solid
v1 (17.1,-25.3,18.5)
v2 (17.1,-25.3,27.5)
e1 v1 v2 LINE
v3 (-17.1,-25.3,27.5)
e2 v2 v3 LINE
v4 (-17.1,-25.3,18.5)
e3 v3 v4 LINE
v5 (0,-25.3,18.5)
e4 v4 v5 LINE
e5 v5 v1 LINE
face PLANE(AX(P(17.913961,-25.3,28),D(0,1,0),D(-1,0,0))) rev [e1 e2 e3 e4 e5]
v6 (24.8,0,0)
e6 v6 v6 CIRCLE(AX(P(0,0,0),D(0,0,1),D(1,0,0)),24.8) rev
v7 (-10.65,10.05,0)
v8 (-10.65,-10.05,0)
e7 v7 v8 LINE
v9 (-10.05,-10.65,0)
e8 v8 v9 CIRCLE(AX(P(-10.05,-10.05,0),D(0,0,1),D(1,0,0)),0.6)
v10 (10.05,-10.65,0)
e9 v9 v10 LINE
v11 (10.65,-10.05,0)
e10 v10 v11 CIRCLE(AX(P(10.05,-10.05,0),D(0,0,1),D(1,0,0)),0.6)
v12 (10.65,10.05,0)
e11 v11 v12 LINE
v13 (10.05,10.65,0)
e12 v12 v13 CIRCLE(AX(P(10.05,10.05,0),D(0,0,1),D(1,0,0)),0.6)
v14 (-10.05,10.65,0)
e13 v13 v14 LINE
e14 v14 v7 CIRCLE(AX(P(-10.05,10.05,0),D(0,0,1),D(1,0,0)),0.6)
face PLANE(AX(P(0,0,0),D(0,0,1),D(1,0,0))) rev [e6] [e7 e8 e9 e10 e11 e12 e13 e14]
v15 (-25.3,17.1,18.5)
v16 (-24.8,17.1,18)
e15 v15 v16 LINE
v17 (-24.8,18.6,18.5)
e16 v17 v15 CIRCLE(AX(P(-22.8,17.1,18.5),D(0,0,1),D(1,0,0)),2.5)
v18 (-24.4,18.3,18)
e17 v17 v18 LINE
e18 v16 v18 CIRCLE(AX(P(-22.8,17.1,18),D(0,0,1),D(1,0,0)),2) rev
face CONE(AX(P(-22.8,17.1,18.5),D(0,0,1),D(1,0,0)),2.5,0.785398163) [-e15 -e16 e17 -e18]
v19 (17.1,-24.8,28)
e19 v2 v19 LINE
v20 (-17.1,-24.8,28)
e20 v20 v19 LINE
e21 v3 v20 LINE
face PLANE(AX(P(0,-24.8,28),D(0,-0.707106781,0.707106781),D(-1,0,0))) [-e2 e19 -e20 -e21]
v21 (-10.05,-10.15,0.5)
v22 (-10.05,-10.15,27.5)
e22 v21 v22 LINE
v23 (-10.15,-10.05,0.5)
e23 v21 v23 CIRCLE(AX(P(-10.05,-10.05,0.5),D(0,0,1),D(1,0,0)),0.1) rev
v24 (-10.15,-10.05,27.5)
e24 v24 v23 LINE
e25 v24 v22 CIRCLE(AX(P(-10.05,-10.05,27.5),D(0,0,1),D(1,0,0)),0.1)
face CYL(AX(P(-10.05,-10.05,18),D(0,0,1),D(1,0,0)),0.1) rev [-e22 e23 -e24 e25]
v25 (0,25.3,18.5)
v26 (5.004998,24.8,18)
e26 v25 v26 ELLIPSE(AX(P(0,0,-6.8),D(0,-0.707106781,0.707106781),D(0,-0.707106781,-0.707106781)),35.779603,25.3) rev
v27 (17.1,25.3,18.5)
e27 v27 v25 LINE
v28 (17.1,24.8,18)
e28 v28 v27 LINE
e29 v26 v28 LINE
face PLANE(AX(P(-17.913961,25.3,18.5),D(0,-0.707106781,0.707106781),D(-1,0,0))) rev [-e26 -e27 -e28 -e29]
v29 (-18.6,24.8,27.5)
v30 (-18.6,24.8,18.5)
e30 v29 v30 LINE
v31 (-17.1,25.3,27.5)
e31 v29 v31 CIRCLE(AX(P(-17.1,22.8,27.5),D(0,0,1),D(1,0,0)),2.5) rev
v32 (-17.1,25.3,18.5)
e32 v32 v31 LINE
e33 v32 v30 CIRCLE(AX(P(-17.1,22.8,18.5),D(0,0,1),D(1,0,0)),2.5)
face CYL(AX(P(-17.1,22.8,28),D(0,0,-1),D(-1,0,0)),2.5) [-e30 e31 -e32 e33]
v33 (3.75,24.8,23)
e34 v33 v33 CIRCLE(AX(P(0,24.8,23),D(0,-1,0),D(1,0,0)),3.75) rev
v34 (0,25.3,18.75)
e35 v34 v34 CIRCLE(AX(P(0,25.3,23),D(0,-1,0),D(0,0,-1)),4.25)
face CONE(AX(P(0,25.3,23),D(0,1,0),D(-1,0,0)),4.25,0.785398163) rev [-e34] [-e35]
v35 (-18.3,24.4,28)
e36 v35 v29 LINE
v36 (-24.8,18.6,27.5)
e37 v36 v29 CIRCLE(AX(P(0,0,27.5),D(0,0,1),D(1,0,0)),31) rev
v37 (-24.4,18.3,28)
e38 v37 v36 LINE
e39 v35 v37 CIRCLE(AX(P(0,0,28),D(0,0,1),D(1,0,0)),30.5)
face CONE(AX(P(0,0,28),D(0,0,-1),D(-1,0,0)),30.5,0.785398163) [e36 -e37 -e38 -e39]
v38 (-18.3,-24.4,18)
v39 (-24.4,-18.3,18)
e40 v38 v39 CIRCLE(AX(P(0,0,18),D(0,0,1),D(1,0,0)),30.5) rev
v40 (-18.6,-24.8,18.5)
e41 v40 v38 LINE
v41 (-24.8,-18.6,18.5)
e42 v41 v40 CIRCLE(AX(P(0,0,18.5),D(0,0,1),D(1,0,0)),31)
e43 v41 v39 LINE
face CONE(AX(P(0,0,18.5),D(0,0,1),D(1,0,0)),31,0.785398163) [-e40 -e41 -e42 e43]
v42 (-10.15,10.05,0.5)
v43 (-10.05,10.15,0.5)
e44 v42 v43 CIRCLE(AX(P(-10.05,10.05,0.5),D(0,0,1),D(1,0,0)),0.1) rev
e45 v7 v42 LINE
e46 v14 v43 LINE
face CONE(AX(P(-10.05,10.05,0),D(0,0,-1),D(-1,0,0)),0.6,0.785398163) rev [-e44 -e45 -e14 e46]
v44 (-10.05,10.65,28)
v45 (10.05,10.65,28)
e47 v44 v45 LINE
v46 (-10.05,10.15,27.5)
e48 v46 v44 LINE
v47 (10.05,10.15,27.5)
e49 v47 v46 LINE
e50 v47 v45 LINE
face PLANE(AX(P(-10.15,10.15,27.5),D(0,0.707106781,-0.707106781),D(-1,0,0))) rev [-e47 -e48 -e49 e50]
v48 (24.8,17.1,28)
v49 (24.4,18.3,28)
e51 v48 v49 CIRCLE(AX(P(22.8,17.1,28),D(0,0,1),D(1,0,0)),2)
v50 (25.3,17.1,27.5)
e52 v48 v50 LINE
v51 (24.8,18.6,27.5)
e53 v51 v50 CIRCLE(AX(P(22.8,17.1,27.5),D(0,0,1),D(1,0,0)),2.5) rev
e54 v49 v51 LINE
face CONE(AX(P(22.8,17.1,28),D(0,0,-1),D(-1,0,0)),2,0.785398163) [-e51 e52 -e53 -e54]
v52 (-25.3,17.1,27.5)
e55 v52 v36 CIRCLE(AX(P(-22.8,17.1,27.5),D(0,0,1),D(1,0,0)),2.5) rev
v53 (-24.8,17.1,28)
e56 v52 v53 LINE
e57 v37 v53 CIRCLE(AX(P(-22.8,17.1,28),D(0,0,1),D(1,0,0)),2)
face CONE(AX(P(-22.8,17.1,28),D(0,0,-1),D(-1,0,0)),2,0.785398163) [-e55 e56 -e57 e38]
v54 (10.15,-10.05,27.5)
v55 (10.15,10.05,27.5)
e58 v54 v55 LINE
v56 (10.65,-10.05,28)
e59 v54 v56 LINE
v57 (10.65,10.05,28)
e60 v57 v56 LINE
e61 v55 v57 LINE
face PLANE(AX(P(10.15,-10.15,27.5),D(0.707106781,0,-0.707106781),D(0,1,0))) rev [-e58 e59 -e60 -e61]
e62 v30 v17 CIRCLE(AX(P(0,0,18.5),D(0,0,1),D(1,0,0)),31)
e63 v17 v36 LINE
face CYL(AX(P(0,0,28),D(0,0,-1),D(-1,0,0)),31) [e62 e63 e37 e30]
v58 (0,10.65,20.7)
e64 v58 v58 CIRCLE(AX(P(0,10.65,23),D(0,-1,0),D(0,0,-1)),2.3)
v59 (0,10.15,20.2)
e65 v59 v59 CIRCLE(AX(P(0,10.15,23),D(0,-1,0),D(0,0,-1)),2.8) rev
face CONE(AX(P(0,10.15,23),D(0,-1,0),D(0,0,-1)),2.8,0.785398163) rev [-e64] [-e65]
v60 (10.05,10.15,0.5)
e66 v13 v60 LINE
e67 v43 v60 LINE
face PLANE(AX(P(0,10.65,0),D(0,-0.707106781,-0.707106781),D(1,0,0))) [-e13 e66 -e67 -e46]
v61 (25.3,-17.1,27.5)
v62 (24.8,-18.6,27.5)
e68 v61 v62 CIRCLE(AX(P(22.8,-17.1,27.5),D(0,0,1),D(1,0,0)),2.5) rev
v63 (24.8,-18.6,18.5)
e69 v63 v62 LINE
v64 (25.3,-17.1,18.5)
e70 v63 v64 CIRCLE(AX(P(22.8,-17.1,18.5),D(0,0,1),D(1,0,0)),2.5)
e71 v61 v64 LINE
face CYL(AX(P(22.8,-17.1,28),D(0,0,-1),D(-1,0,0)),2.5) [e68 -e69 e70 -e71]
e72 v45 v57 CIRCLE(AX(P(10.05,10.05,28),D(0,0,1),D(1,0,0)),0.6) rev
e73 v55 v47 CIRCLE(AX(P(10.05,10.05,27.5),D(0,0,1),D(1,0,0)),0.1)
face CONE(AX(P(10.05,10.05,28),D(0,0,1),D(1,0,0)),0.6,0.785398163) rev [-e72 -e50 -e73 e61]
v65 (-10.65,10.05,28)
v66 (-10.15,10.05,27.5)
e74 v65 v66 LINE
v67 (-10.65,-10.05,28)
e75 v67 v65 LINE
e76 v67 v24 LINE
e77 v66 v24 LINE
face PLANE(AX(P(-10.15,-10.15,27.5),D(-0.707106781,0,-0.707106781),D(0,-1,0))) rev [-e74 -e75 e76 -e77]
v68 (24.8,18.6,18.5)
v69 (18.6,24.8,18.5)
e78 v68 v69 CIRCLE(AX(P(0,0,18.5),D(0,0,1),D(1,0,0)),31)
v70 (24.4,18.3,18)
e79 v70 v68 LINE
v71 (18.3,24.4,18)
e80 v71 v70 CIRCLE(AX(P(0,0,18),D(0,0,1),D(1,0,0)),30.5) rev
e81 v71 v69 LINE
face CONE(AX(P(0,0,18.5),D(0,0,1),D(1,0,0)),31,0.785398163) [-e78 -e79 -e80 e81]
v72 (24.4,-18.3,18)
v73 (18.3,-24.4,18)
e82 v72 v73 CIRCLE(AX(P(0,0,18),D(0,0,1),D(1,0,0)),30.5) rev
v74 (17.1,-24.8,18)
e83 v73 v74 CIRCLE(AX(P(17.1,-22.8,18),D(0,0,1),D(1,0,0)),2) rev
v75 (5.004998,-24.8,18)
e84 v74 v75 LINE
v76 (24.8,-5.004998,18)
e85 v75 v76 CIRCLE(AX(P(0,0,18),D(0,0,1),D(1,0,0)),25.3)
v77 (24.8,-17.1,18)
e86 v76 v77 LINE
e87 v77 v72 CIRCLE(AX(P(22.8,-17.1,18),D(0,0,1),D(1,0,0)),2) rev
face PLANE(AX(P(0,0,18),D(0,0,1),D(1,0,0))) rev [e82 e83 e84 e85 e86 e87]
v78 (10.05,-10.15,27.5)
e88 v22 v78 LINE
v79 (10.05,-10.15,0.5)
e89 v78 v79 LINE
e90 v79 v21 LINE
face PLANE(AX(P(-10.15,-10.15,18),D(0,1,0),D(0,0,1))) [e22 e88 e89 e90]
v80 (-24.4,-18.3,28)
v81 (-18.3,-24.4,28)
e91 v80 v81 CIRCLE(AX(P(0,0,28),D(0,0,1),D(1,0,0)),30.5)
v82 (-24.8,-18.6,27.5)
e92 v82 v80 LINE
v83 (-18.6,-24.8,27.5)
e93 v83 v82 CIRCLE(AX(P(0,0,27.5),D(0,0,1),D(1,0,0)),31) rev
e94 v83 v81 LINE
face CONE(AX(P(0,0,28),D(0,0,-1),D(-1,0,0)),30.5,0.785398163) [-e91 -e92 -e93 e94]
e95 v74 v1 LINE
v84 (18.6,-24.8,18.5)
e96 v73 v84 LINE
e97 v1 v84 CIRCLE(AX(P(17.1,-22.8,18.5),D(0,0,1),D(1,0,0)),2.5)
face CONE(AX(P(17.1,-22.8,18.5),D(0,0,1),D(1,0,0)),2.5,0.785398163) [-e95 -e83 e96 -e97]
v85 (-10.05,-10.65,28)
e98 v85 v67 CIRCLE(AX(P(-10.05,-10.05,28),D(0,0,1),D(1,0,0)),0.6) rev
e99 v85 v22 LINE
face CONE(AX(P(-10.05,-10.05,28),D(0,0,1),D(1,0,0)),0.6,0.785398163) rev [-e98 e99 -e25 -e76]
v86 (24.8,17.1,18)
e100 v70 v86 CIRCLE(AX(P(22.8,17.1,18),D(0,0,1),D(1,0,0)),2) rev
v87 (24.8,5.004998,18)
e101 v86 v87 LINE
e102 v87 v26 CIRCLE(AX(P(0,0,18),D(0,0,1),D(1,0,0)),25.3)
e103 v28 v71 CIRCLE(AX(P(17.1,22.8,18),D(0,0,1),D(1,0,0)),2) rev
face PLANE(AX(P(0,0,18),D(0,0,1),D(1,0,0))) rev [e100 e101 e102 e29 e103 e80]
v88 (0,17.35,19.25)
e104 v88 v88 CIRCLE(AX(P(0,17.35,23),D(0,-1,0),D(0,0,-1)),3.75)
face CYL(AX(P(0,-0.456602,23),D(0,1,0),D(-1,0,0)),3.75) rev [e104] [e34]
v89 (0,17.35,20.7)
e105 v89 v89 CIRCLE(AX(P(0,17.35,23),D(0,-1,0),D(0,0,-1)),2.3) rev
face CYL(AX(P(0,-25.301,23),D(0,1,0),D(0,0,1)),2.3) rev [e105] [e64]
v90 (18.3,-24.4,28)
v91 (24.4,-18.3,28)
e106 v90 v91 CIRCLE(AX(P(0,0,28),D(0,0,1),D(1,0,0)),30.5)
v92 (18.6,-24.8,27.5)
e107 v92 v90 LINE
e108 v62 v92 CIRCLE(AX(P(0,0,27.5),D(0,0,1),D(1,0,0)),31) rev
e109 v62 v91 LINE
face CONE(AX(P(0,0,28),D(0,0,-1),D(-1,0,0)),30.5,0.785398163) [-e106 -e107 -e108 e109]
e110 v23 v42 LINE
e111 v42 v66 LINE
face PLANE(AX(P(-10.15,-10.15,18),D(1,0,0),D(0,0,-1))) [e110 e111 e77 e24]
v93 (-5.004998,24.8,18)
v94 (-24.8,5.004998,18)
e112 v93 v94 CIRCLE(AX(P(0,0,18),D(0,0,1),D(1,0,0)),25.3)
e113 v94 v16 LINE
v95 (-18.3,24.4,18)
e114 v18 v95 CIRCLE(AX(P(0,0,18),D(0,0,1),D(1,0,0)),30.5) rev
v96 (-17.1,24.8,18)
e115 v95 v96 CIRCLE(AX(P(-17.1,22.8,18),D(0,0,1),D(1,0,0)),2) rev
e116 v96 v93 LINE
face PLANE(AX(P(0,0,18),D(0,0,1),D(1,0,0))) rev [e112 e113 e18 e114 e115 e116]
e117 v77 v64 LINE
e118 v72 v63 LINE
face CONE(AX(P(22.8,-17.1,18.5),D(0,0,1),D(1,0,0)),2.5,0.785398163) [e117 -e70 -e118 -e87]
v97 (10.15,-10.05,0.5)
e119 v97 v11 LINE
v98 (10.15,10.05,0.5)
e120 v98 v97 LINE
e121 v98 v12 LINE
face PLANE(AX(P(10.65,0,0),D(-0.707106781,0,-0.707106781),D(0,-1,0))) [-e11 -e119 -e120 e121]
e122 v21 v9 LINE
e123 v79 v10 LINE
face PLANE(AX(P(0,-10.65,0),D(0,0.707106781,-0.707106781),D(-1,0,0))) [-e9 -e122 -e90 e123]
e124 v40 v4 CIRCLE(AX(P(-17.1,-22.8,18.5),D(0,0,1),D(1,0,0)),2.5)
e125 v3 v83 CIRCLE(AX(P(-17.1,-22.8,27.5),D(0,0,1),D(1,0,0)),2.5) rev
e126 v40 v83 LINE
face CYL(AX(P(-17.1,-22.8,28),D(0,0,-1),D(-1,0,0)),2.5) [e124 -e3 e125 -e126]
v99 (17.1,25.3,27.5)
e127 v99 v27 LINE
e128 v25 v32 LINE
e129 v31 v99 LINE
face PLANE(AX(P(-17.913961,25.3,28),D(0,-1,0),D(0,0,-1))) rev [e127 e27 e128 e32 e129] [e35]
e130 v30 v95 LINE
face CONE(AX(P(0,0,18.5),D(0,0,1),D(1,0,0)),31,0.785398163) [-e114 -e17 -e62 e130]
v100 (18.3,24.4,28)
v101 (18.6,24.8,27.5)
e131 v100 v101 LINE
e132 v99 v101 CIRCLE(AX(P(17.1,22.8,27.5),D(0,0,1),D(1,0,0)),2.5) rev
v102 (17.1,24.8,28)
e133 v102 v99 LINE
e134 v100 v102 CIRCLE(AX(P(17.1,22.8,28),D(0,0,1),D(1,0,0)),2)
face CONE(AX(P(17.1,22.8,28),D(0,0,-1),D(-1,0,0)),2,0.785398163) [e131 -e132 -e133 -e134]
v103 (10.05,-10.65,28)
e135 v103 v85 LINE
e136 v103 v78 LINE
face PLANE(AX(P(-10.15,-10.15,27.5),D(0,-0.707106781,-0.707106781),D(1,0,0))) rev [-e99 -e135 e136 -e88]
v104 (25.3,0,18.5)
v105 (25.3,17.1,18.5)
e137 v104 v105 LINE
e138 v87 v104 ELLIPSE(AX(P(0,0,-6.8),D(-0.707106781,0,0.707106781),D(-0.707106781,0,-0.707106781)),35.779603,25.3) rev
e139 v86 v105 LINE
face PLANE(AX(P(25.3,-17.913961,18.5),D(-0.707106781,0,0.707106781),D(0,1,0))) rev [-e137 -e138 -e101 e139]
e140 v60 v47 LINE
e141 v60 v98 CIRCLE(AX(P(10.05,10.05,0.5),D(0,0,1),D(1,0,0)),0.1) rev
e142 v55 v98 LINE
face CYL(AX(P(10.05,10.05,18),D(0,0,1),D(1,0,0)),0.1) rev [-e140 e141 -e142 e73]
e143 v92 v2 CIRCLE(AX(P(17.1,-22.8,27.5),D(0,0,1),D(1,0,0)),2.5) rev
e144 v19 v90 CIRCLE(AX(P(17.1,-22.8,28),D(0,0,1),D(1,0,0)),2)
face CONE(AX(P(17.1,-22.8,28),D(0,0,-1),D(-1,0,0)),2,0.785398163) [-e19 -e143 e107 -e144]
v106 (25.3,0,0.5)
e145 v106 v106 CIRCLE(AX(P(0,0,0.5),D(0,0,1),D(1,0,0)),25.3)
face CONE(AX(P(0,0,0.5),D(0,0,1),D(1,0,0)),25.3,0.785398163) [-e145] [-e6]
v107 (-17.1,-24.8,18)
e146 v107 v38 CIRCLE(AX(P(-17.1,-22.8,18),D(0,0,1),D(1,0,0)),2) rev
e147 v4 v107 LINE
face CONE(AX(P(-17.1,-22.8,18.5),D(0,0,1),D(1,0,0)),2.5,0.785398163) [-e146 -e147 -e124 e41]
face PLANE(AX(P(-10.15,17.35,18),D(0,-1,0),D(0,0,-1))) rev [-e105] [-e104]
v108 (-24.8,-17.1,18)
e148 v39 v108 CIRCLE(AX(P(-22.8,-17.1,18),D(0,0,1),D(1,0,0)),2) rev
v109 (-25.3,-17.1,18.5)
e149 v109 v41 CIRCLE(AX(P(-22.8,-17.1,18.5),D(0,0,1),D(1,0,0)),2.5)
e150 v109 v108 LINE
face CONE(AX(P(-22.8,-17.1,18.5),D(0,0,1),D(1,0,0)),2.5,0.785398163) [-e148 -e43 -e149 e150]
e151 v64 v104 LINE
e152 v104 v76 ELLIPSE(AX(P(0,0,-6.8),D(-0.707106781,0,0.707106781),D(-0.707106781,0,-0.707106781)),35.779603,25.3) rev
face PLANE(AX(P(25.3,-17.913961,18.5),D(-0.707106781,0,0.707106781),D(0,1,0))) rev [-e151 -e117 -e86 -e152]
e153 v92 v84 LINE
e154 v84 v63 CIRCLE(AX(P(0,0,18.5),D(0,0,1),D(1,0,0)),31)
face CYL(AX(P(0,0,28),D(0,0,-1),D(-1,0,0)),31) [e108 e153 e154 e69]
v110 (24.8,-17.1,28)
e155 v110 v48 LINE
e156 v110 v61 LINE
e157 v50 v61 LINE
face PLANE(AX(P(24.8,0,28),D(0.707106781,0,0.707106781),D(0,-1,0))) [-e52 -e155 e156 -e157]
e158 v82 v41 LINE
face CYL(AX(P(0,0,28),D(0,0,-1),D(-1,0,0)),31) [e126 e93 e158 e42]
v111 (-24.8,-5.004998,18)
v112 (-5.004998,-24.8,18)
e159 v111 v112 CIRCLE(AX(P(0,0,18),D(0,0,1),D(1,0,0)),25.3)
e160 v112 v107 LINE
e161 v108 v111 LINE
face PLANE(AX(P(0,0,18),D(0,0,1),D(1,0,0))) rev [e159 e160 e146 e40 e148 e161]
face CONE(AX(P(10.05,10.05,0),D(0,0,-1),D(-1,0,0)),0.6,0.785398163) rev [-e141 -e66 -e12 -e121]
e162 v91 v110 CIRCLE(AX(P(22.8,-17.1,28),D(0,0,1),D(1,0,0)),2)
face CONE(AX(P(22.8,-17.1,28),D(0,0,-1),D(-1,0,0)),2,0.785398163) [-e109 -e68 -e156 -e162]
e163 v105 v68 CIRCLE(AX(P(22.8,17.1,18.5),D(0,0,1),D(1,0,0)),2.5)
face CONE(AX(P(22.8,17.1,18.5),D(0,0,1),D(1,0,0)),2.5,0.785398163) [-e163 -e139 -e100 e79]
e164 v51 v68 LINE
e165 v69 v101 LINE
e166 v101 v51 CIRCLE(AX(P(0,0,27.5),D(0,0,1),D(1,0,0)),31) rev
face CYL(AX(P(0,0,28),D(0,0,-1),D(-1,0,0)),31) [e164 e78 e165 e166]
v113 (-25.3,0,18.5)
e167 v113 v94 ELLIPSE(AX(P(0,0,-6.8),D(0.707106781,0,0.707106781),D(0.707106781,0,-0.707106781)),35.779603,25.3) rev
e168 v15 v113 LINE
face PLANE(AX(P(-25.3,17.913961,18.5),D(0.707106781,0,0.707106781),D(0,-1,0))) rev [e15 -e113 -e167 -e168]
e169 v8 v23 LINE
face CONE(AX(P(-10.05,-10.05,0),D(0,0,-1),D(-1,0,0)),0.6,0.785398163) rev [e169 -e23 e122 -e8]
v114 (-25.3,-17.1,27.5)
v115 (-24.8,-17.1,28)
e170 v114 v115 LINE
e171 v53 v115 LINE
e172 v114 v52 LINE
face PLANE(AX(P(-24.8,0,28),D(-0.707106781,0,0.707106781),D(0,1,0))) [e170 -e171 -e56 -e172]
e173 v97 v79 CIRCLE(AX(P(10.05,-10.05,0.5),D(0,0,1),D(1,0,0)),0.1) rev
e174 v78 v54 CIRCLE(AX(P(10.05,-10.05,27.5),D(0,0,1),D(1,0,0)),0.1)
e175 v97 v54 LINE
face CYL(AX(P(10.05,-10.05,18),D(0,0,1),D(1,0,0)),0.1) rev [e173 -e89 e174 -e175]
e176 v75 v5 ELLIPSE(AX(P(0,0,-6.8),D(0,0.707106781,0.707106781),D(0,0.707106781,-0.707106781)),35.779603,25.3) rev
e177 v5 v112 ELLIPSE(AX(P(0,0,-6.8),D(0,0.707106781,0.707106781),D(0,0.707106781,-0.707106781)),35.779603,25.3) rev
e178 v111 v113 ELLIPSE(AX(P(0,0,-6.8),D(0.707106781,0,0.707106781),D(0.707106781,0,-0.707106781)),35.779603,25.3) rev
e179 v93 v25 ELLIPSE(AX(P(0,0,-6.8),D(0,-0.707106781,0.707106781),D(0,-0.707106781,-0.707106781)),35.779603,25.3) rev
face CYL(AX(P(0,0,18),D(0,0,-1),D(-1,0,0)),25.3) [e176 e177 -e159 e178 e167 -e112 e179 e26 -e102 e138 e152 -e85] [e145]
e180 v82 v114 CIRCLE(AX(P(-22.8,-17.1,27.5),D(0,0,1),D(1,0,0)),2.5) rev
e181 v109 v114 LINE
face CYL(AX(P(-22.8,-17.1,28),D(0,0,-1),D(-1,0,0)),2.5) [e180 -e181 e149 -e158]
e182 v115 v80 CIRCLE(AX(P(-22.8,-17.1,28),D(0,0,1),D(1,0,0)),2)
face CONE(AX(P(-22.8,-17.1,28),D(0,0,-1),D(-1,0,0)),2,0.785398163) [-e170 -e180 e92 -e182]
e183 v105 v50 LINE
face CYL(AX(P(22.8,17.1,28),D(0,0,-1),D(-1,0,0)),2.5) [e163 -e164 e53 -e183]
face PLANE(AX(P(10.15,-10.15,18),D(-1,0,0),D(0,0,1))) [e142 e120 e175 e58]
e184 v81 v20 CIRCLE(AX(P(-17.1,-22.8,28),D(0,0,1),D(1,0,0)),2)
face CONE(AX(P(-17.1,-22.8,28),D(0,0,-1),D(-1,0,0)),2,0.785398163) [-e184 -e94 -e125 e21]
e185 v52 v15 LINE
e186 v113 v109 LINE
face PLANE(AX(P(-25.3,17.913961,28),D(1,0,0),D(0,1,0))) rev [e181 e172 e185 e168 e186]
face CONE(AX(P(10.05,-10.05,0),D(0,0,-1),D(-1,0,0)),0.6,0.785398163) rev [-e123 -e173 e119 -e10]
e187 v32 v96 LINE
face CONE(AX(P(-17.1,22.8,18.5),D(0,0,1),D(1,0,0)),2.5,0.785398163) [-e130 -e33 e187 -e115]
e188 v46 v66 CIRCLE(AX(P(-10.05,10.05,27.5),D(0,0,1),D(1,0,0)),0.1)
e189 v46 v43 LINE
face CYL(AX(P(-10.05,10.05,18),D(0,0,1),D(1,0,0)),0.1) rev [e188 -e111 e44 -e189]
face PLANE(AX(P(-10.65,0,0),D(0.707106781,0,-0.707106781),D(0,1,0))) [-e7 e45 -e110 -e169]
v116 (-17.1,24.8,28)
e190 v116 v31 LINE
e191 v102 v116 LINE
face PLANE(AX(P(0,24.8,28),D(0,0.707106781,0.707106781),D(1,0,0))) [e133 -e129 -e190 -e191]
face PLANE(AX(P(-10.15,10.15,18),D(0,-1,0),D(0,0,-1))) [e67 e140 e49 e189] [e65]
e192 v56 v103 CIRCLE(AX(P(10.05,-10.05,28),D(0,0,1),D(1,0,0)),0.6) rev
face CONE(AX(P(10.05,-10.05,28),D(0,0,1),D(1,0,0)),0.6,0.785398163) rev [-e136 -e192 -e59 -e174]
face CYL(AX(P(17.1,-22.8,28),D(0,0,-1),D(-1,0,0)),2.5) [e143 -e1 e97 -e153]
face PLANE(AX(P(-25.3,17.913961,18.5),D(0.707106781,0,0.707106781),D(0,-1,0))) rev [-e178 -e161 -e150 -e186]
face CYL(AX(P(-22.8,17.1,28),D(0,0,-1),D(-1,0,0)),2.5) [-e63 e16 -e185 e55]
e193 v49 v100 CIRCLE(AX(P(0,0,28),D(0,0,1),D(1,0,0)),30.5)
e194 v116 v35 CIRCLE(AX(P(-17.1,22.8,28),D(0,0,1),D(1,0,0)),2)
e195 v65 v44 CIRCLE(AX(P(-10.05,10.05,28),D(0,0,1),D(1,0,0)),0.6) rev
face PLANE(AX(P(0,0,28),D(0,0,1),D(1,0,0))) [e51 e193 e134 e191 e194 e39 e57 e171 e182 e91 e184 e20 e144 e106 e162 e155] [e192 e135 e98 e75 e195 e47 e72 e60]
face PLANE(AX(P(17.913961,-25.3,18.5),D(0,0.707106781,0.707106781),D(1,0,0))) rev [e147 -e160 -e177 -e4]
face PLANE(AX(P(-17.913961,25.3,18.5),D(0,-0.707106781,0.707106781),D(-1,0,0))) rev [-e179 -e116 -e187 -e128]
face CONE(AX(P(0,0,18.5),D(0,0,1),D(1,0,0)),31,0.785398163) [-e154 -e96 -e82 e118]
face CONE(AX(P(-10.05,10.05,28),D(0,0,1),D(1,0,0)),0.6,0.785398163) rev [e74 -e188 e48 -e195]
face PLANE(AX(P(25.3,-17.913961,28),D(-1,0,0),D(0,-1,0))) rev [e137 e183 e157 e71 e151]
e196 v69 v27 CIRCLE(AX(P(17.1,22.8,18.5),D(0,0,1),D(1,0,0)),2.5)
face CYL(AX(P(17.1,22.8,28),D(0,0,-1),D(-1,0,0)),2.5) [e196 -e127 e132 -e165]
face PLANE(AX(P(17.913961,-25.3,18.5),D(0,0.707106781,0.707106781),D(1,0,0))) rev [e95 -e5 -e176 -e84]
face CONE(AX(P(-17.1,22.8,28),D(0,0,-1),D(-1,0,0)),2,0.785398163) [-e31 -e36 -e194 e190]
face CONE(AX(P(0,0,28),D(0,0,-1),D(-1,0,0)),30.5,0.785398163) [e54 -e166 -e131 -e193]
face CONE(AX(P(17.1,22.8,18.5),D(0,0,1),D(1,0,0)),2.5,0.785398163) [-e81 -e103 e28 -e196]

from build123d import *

# Parameters (mm, degrees)
SKIZZE1_R                       = 25.3
SKIZZE1_W                       = 20.3
SKIZZE1_H                       = 20.3
AUFSATZ_LINEAR_AUSTRAGEN1_DEPTH = 18
SKIZZE2_W                       = 20.3
SKIZZE2_H                       = 20.3
AUFSATZ_LINEAR_AUSTRAGEN2_DEPTH = 10
SCHNITT_LINEAR_AUSTRAGEN1_REACH = 65.122
SKIZZE3_R                       = 2.3
CUT_EXTRUDE2_START              = -50.6
SKETCH1_2_R                     = 3.75
CUT_EXTRUDE2_DEPTH              = 7.95
VERRUNDUNG1_R                   = 0.1
VERRUNDUNG2_R                   = 2.5
FASE1_SIZE                      = 0.5


with BuildPart() as part:
    # Skizze1 → Aufsatz-Linear austragen1 (new body)
    with BuildSketch(Plane.XY):
        Circle(SKIZZE1_R)
        Rectangle(SKIZZE1_W, SKIZZE1_H, mode=Mode.SUBTRACT)
    extrude(amount=AUFSATZ_LINEAR_AUSTRAGEN1_DEPTH)

    # Skizze2 → Aufsatz-Linear austragen2 (add)
    with BuildSketch(Plane.XY.offset(18)):
        with BuildLine():
            Line((-17.913961036, 25.3), (17.913961036, 25.3))
            ThreePointArc((17.913961036, 25.3), (21.920310217, 21.920310217), (25.3, 17.913961036))
            Line((25.3, 17.913961036), (25.3, -17.913961036))
            ThreePointArc((25.3, -17.913961036), (21.920310217, -21.920310217), (17.913961036, -25.3))
            Line((17.913961036, -25.3), (-17.913961036, -25.3))
            ThreePointArc((-17.913961036, -25.3), (-21.920310217, -21.920310217), (-25.3, -17.913961036))
            Line((-25.3, -17.913961036), (-25.3, 17.913961036))
            ThreePointArc((-25.3, 17.913961036), (-21.920310217, 21.920310217), (-17.913961036, 25.3))
        make_face()
        Rectangle(SKIZZE2_W, SKIZZE2_H, mode=Mode.SUBTRACT)
    extrude(amount=AUFSATZ_LINEAR_AUSTRAGEN2_DEPTH)

    # Skizze3 → Schnitt-Linear austragen1 (cut, up to next)
    with BuildSketch(Plane(origin=(0, 25.3, 0), x_dir=(1, 0, 0), z_dir=(0, 1, 0)), mode=Mode.PRIVATE) as schnitt_linear_austragen1_sk1:
        with Locations(Location((0, -23, 0), (0, 0, 270))):
            Circle(SKIZZE3_R)
    schnitt_linear_austragen1_tool1 = extrude(schnitt_linear_austragen1_sk1.sketch, amount=-SCHNITT_LINEAR_AUSTRAGEN1_REACH, mode=Mode.PRIVATE) & part.part
    add(schnitt_linear_austragen1_tool1.solids().sort_by_distance((0, 25.3, 23))[0], mode=Mode.SUBTRACT)

    # Sketch1<2> → Cut-Extrude2 (cut)
    with BuildSketch(Plane.XZ.offset(25.3).offset(CUT_EXTRUDE2_START)):
        with Locations(Location((0, 23, 0), (0, 0, 270))):
            Circle(SKETCH1_2_R)
    extrude(amount=CUT_EXTRUDE2_DEPTH, mode=Mode.SUBTRACT)

    # Verrundung1
    verrundung1_edges = [part.edges().sort_by_distance(p)[0] for p in [
        (10.15, -10.15, 14),
        (10.15, 10.15, 14),
        (-10.15, 10.15, 14),
        (-10.15, -10.15, 14),
    ]]
    fillet(verrundung1_edges, radius=VERRUNDUNG1_R)

    # Verrundung2
    verrundung2_edges = [part.edges().sort_by_distance(p)[0] for p in [
        (-17.913961036, 25.3, 23),
        (-25.3, 17.913961036, 23),
        (-25.3, -17.913961036, 23),
        (-17.913961036, -25.3, 23),
        (17.913961036, -25.3, 23),
        (25.3, -17.913961036, 23),
        (25.3, 17.913961036, 23),
        (17.913961036, 25.3, 23),
    ]]
    fillet(verrundung2_edges, radius=VERRUNDUNG2_R)

    # Fase1
    # the kernel refuses this chamfer: 0.5 mm, written as the material it takes off along each edge
    with BuildSketch(Plane(origin=(-22.8, -17.1, 18), x_dir=(-0.8000000000000012, -0.5999999999999983, 0), z_dir=(0.5999999999999983, -0.8000000000000012, 0))) as fase1_piece_1:
        Polygon((2.5, -FASE1_SIZE), (2.5 - FASE1_SIZE, 0), (2.5, 0), align=None)
    revolve(axis=Axis((-22.8, -17.1, 18), (0, 0, -1)), revolution_arc=36.869897646, mode=Mode.SUBTRACT)
    with BuildSketch(Plane(origin=(-25.3, 8.3e-08, 18), x_dir=(-0.027495876610589005, 0, 0.9996219169112968), z_dir=(0, 1, 0))) as fase1_piece_2_section:
        Polygon((FASE1_SIZE * 0.999621916911, FASE1_SIZE * 0.0274958766106), (-FASE1_SIZE * 0.0274958766106, FASE1_SIZE * 0.999621916911), (0, 0), align=None)
    fase1_piece_2 = extrude(amount=17.099999917, mode=Mode.PRIVATE)
    fase1_piece_2 = fase1_piece_2 - Plane(origin=(0, 0, 18.17274178), x_dir=(1, 0, 0), z_dir=(0, 0, -1)) * Cylinder(25.3, 37, mode=Mode.PRIVATE)
    add(fase1_piece_2, mode=Mode.SUBTRACT)
    with BuildSketch(Plane(origin=(-25.3, -17.1, 28), x_dir=(0.9996219169112968, 0, 0.027495876610589005), z_dir=(0, 1, 0)), Plane(origin=(17.1, -25.3, 28), x_dir=(0, 0.9996219169112968, 0.027495876610589005), z_dir=(-1, 0, 0)), Plane(origin=(25.3, 17.1, 28), x_dir=(-0.9996219169112968, 0, 0.027495876610589005), z_dir=(0, -1, 0)), Plane(origin=(-17.1, 25.3, 28), x_dir=(0, -0.9996219169112968, 0.027495876610589005), z_dir=(1, 0, 0))) as fase1_piece_3:
        Polygon((FASE1_SIZE * 0.999621916911, FASE1_SIZE * 0.0274958766106), (-FASE1_SIZE * 0.0274958766106, FASE1_SIZE * 0.999621916911), (0, 0), align=None)
    extrude(amount=34.2, mode=Mode.SUBTRACT)
    with BuildSketch(Plane(origin=(0, 0, 28), x_dir=(-0.8000000000000004, 0.5999999999999995, 0), z_dir=(-0.5999999999999995, -0.8000000000000004, 0))) as fase1_piece_4:
        Polygon((31 - FASE1_SIZE, 0), (31, FASE1_SIZE), (31, 0), align=None)
    revolve(axis=Axis((0, 0, 28), (0, 0, -1)), revolution_arc=16.260204708, mode=Mode.SUBTRACT)
    with BuildSketch(Plane(origin=(0, 0, 28), x_dir=(0.8, -0.5999999999999999, 0), z_dir=(0.5999999999999999, 0.8, 0))) as fase1_piece_5:
        Polygon((31 - FASE1_SIZE, 0), (31, FASE1_SIZE), (31, 0), align=None)
    revolve(axis=Axis((0, 0, 28), (0, 0, -1)), revolution_arc=16.260204708, mode=Mode.SUBTRACT)
    with BuildSketch(Plane(origin=(0, 0, 28), x_dir=(0.5999999999999996, 0.8000000000000003, 0), z_dir=(-0.8000000000000003, 0.5999999999999996, 0))) as fase1_piece_6:
        Polygon((31 - FASE1_SIZE, 0), (31, FASE1_SIZE), (31, 0), align=None)
    revolve(axis=Axis((0, 0, 28), (0, 0, -1)), revolution_arc=16.260204708, mode=Mode.SUBTRACT)
    with BuildSketch(Plane(origin=(-17.1, 22.8, 28), x_dir=(0, 1, 0), z_dir=(1, 0, 0))) as fase1_piece_7:
        Polygon((2.5 - FASE1_SIZE, 0), (2.5, -FASE1_SIZE), (2.5, 0), align=None)
    revolve(axis=Axis((-17.1, 22.8, 28), (0, 0, 1)), revolution_arc=36.869897646, mode=Mode.SUBTRACT)
    with BuildSketch(Plane(origin=(-22.8, 17.1, 28), x_dir=(-1, 0, 0), z_dir=(0, -1, 0))) as fase1_piece_8:
        Polygon((2.5 - FASE1_SIZE, 0), (2.5, FASE1_SIZE), (2.5, 0), align=None)
    revolve(axis=Axis((-22.8, 17.1, 28), (0, 0, -1)), revolution_arc=36.869897646, mode=Mode.SUBTRACT)
    with BuildSketch(Plane(origin=(17.1, 22.8, 28), x_dir=(0, 1, 0), z_dir=(-1, 0, 0))) as fase1_piece_9:
        Polygon((2.5 - FASE1_SIZE, 0), (2.5, FASE1_SIZE), (2.5, 0), align=None)
    revolve(axis=Axis((17.1, 22.8, 28), (0, 0, -1)), revolution_arc=36.869897646, mode=Mode.SUBTRACT)
    with BuildSketch(Plane(origin=(22.8, 17.1, 28), x_dir=(0.8, 0.6, 0), z_dir=(-0.6, 0.8, 0))) as fase1_piece_10:
        Polygon((2.5 - FASE1_SIZE, 0), (2.5, FASE1_SIZE), (2.5, 0), align=None)
    revolve(axis=Axis((22.8, 17.1, 28), (0, 0, -1)), revolution_arc=36.869897646, mode=Mode.SUBTRACT)
    with BuildSketch(Plane(origin=(22.8, -17.1, 28), x_dir=(1, 0, 0), z_dir=(0, 1, 0))) as fase1_piece_11:
        Polygon((2.5 - FASE1_SIZE, 0), (2.5, FASE1_SIZE), (2.5, 0), align=None)
    revolve(axis=Axis((22.8, -17.1, 28), (0, 0, -1)), revolution_arc=36.869897646, mode=Mode.SUBTRACT)
    with BuildSketch(Plane(origin=(17.1, -22.8, 28), x_dir=(0.6000000000000009, -0.7999999999999993, 0), z_dir=(0.7999999999999993, 0.6000000000000009, 0))) as fase1_piece_12:
        Polygon((2.5 - FASE1_SIZE, 0), (2.5, FASE1_SIZE), (2.5, 0), align=None)
    revolve(axis=Axis((17.1, -22.8, 28), (0, 0, -1)), revolution_arc=36.869897646, mode=Mode.SUBTRACT)
    with BuildSketch(Plane(origin=(-17.1, -22.8, 28), x_dir=(0, -1, 0), z_dir=(1, 0, 0))) as fase1_piece_13:
        Polygon((2.5 - FASE1_SIZE, 0), (2.5, FASE1_SIZE), (2.5, 0), align=None)
    revolve(axis=Axis((-17.1, -22.8, 28), (0, 0, -1)), revolution_arc=36.869897646, mode=Mode.SUBTRACT)
    with BuildSketch(Plane(origin=(-22.8, -17.1, 28), x_dir=(-0.8000000000000012, -0.5999999999999983, 0), z_dir=(0.5999999999999983, -0.8000000000000012, 0))) as fase1_piece_14:
        Polygon((2.5 - FASE1_SIZE, 0), (2.5, FASE1_SIZE), (2.5, 0), align=None)
    revolve(axis=Axis((-22.8, -17.1, 28), (0, 0, -1)), revolution_arc=36.869897646, mode=Mode.SUBTRACT)
    with BuildSketch(Plane(origin=(0, 0, 18), x_dir=(0.8, -0.5999999999999999, 0), z_dir=(0.5999999999999999, 0.8, 0))) as fase1_piece_15:
        Polygon((31, -FASE1_SIZE), (31 - FASE1_SIZE, 0), (31, 0), align=None)
    revolve(axis=Axis((0, 0, 18), (0, 0, -1)), revolution_arc=16.260204708, mode=Mode.SUBTRACT)
    with BuildSketch(Plane(origin=(25.3, 0, 18), x_dir=(0.027495876610589005, 0, 0.9996219169112968), z_dir=(0, -1, 0))) as fase1_piece_16_section:
        Polygon((FASE1_SIZE * 0.999621916911, FASE1_SIZE * 0.0274958766106), (-FASE1_SIZE * 0.0274958766106, FASE1_SIZE * 0.999621916911), (0, 0), align=None)
    fase1_piece_16 = extrude(amount=17.1, mode=Mode.PRIVATE)
    fase1_piece_16 = fase1_piece_16 - Plane(origin=(0, 0, 18.172741783), x_dir=(1, 0, 0), z_dir=(0, 0, -1)) * Cylinder(25.3, 37, mode=Mode.PRIVATE)
    add(fase1_piece_16, mode=Mode.SUBTRACT)
    with BuildSketch(Plane(origin=(22.8, -17.1, 18), x_dir=(1, 0, 0), z_dir=(0, 1, 0))) as fase1_piece_17:
        Polygon((2.5, -FASE1_SIZE), (2.5 - FASE1_SIZE, 0), (2.5, 0), align=None)
    revolve(axis=Axis((22.8, -17.1, 18), (0, 0, -1)), revolution_arc=36.869897646, mode=Mode.SUBTRACT)
    with BuildSketch(Plane(origin=(17.1, -22.8, 18), x_dir=(0.6000000000000009, -0.7999999999999993, 0), z_dir=(0.7999999999999993, 0.6000000000000009, 0))) as fase1_piece_18:
        Polygon((2.5, -FASE1_SIZE), (2.5 - FASE1_SIZE, 0), (2.5, 0), align=None)
    revolve(axis=Axis((17.1, -22.8, 18), (0, 0, -1)), revolution_arc=36.869897646, mode=Mode.SUBTRACT)
    with BuildSketch(Plane(origin=(0, 0, 18), x_dir=(0.5999999999999996, 0.8000000000000003, 0), z_dir=(-0.8000000000000003, 0.5999999999999996, 0))) as fase1_piece_19:
        Polygon((31, -FASE1_SIZE), (31 - FASE1_SIZE, 0), (31, 0), align=None)
    revolve(axis=Axis((0, 0, 18), (0, 0, -1)), revolution_arc=16.260204708, mode=Mode.SUBTRACT)
    with BuildSketch(Plane(origin=(0, 25.3, 18), x_dir=(0, 0.027495876610589005, 0.9996219169112968), z_dir=(1, 0, 0))) as fase1_piece_20_section:
        Polygon((FASE1_SIZE * 0.999621916911, FASE1_SIZE * 0.0274958766106), (-FASE1_SIZE * 0.0274958766106, FASE1_SIZE * 0.999621916911), (0, 0), align=None)
    fase1_piece_20 = extrude(amount=17.1, mode=Mode.PRIVATE)
    fase1_piece_20 = fase1_piece_20 - Plane(origin=(0, 0, 18.17274178), x_dir=(1, 0, 0), z_dir=(0, 0, -1)) * Cylinder(25.3, 37, mode=Mode.PRIVATE)
    add(fase1_piece_20, mode=Mode.SUBTRACT)
    with BuildSketch(Plane(origin=(17.1, 22.8, 18), x_dir=(0, 1, 0), z_dir=(-1, 0, 0))) as fase1_piece_21:
        Polygon((2.5, -FASE1_SIZE), (2.5 - FASE1_SIZE, 0), (2.5, 0), align=None)
    revolve(axis=Axis((17.1, 22.8, 18), (0, 0, -1)), revolution_arc=36.869897646, mode=Mode.SUBTRACT)
    with BuildSketch(Plane(origin=(22.8, 17.1, 18), x_dir=(0.8, 0.6, 0), z_dir=(-0.6, 0.8, 0))) as fase1_piece_22:
        Polygon((2.5, -FASE1_SIZE), (2.5 - FASE1_SIZE, 0), (2.5, 0), align=None)
    revolve(axis=Axis((22.8, 17.1, 18), (0, 0, -1)), revolution_arc=36.869897646, mode=Mode.SUBTRACT)
    with BuildSketch(Plane(origin=(0, 0, 18), x_dir=(-0.8000000000000004, 0.5999999999999995, 0), z_dir=(-0.5999999999999995, -0.8000000000000004, 0))) as fase1_piece_23:
        Polygon((31, -FASE1_SIZE), (31 - FASE1_SIZE, 0), (31, 0), align=None)
    revolve(axis=Axis((0, 0, 18), (0, 0, -1)), revolution_arc=16.260204708, mode=Mode.SUBTRACT)
    with BuildSketch(Plane(origin=(-17.1, 22.8, 18), x_dir=(0, 1, 0), z_dir=(1, 0, 0))) as fase1_piece_24:
        Polygon((2.5, FASE1_SIZE), (2.5 - FASE1_SIZE, 0), (2.5, 0), align=None)
    revolve(axis=Axis((-17.1, 22.8, 18), (0, 0, 1)), revolution_arc=36.869897646, mode=Mode.SUBTRACT)
    with BuildSketch(Plane(origin=(-22.8, 17.1, 18), x_dir=(-1, 0, 0), z_dir=(0, -1, 0))) as fase1_piece_25:
        Polygon((2.5, -FASE1_SIZE), (2.5 - FASE1_SIZE, 0), (2.5, 0), align=None)
    revolve(axis=Axis((-22.8, 17.1, 18), (0, 0, -1)), revolution_arc=36.869897646, mode=Mode.SUBTRACT)
    with BuildSketch(Plane(origin=(0, 0, 0), x_dir=(1, 0, 0), z_dir=(0, -1, 0))) as fase1_piece_26:
        Polygon((25.3 - FASE1_SIZE, 0), (25.3, FASE1_SIZE), (25.3, 0), align=None)
    revolve(axis=Axis((0, 0, 0), (0, 0, 1)), mode=Mode.SUBTRACT)
    with BuildSketch(Plane(origin=(-25.3, -17.1, 18), x_dir=(-0.027495876610589005, 0, 0.9996219169112968), z_dir=(0, 1, 0))) as fase1_piece_27_section:
        Polygon((FASE1_SIZE * 0.999621916911, FASE1_SIZE * 0.0274958766106), (-FASE1_SIZE * 0.0274958766106, FASE1_SIZE * 0.999621916911), (0, 0), align=None)
    fase1_piece_27 = extrude(amount=17.100000083, mode=Mode.PRIVATE)
    fase1_piece_27 = fase1_piece_27 - Plane(origin=(0, 0, 18.17274177), x_dir=(1, 0, 0), z_dir=(0, 0, -1)) * Cylinder(25.3, 37, mode=Mode.PRIVATE)
    add(fase1_piece_27, mode=Mode.SUBTRACT)
    with BuildSketch(Plane(origin=(17.1, -25.3, 18), x_dir=(0, -0.027495876610589005, 0.9996219169112968), z_dir=(-1, 0, 0))) as fase1_piece_28_section:
        Polygon((FASE1_SIZE * 0.999621916911, FASE1_SIZE * 0.0274958766106), (-FASE1_SIZE * 0.0274958766106, FASE1_SIZE * 0.999621916911), (0, 0), align=None)
    fase1_piece_28 = extrude(amount=17.099999919, mode=Mode.PRIVATE)
    fase1_piece_28 = fase1_piece_28 - Plane(origin=(0, 0, 18.17274177), x_dir=(1, 0, 0), z_dir=(0, 0, -1)) * Cylinder(25.3, 37, mode=Mode.PRIVATE)
    add(fase1_piece_28, mode=Mode.SUBTRACT)
    with BuildSketch(Plane(origin=(25.3, 17.1, 18), x_dir=(0.027495876610589005, 0, 0.9996219169112968), z_dir=(0, -1, 0))) as fase1_piece_29_section:
        Polygon((FASE1_SIZE * 0.999621916911, FASE1_SIZE * 0.0274958766106), (-FASE1_SIZE * 0.0274958766106, FASE1_SIZE * 0.999621916911), (0, 0), align=None)
    fase1_piece_29 = extrude(amount=17.1, mode=Mode.PRIVATE)
    fase1_piece_29 = fase1_piece_29 - Plane(origin=(0, 0, 18.17274177), x_dir=(1, 0, 0), z_dir=(0, 0, -1)) * Cylinder(25.3, 37, mode=Mode.PRIVATE)
    add(fase1_piece_29, mode=Mode.SUBTRACT)
    with BuildSketch(Plane(origin=(-17.1, 25.3, 18), x_dir=(0, 0.027495876610589005, 0.9996219169112968), z_dir=(1, 0, 0))) as fase1_piece_30_section:
        Polygon((FASE1_SIZE * 0.999621916911, FASE1_SIZE * 0.0274958766106), (-FASE1_SIZE * 0.0274958766106, FASE1_SIZE * 0.999621916911), (0, 0), align=None)
    fase1_piece_30 = extrude(amount=17.1, mode=Mode.PRIVATE)
    fase1_piece_30 = fase1_piece_30 - Plane(origin=(0, 0, 18.172741783), x_dir=(1, 0, 0), z_dir=(0, 0, -1)) * Cylinder(25.3, 37, mode=Mode.PRIVATE)
    add(fase1_piece_30, mode=Mode.SUBTRACT)
    with BuildSketch(Plane(origin=(0, 10.15, 23), x_dir=(0, 0, 1), z_dir=(-1, 0, 0))) as fase1_piece_31:
        Polygon((2.3 + FASE1_SIZE, 0), (2.3, FASE1_SIZE), (2.3, 0), align=None)
    revolve(axis=Axis((0, 10.15, 23), (0, 1, 0)), mode=Mode.SUBTRACT)
    with BuildSketch(Plane(origin=(0, 25.3, 23), x_dir=(0, 0, -1), z_dir=(-1, 0, 0))) as fase1_piece_32:
        Polygon((3.75 + FASE1_SIZE, 0), (3.75, FASE1_SIZE), (3.75, 0), align=None)
    revolve(axis=Axis((0, 25.3, 23), (0, -1, 0)), mode=Mode.SUBTRACT)
    with BuildSketch(Plane(origin=(-10.05, -10.15, 0), x_dir=(0, 0.02749587661058563, 0.9996219169112968), z_dir=(1, 0, 0)), Plane(origin=(-10.05, -10.15, 28), x_dir=(0, -0.9996219169112968, 0.0274958766105891), z_dir=(1, 0, 0)), Plane(origin=(10.15, -10.05, 0), x_dir=(-0.02749587661058563, 0, 0.9996219169112968), z_dir=(0, 1, 0)), Plane(origin=(10.15, -10.05, 28), x_dir=(0.9996219169112968, 0, 0.0274958766105891), z_dir=(0, 1, 0)), Plane(origin=(-10.15, 10.05, 0), x_dir=(0.02749587661058563, 0, 0.9996219169112968), z_dir=(0, -1, 0)), Plane(origin=(-10.15, 10.05, 28), x_dir=(-0.9996219169112968, 0, 0.0274958766105891), z_dir=(0, -1, 0)), Plane(origin=(10.05, 10.15, 0), x_dir=(0, -0.02749587661058563, 0.9996219169112968), z_dir=(-1, 0, 0)), Plane(origin=(10.05, 10.15, 28), x_dir=(0, 0.9996219169112968, 0.0274958766105891), z_dir=(-1, 0, 0))) as fase1_piece_33:
        Polygon((FASE1_SIZE * 0.999621916911, FASE1_SIZE * 0.0274958766106), (-FASE1_SIZE * 0.0274958766106, FASE1_SIZE * 0.999621916911), (0, 0), align=None)
    extrude(amount=20.1, mode=Mode.SUBTRACT)
    with BuildSketch(Plane(origin=(10.05, -10.05, 0), x_dir=(1, 0, 0), z_dir=(0, 1, 0))) as fase1_piece_34:
        Polygon((0.1, -FASE1_SIZE), (0.1 + FASE1_SIZE, 0), (0.1, 0), align=None)
    revolve(axis=Axis((10.05, -10.05, 0), (0, 0, -1)), revolution_arc=90, mode=Mode.SUBTRACT)
    with BuildSketch(Plane(origin=(10.05, -10.05, 28), x_dir=(1, 0, 0), z_dir=(0, 1, 0))) as fase1_piece_35:
        Polygon((0.1 + FASE1_SIZE, 0), (0.1, FASE1_SIZE), (0.1, 0), align=None)
    revolve(axis=Axis((10.05, -10.05, 28), (0, 0, -1)), revolution_arc=90, mode=Mode.SUBTRACT)
    with BuildSketch(Plane(origin=(-10.05, -10.05, 0), x_dir=(-1, 0, 0), z_dir=(0, 1, 0))) as fase1_piece_36:
        Polygon((0.1, FASE1_SIZE), (0.1 + FASE1_SIZE, 0), (0.1, 0), align=None)
    revolve(axis=Axis((-10.05, -10.05, 0), (0, 0, 1)), revolution_arc=90, mode=Mode.SUBTRACT)
    with BuildSketch(Plane(origin=(-10.05, -10.05, 28), x_dir=(-1, 0, 0), z_dir=(0, 1, 0))) as fase1_piece_37:
        Polygon((0.1 + FASE1_SIZE, 0), (0.1, -FASE1_SIZE), (0.1, 0), align=None)
    revolve(axis=Axis((-10.05, -10.05, 28), (0, 0, 1)), revolution_arc=90, mode=Mode.SUBTRACT)
    with BuildSketch(Plane(origin=(-10.05, 10.05, 0), x_dir=(-1, 0, 0), z_dir=(0, -1, 0))) as fase1_piece_38:
        Polygon((0.1, -FASE1_SIZE), (0.1 + FASE1_SIZE, 0), (0.1, 0), align=None)
    revolve(axis=Axis((-10.05, 10.05, 0), (0, 0, -1)), revolution_arc=90, mode=Mode.SUBTRACT)
    with BuildSketch(Plane(origin=(-10.05, 10.05, 28), x_dir=(-1, 0, 0), z_dir=(0, -1, 0))) as fase1_piece_39:
        Polygon((0.1 + FASE1_SIZE, 0), (0.1, FASE1_SIZE), (0.1, 0), align=None)
    revolve(axis=Axis((-10.05, 10.05, 28), (0, 0, -1)), revolution_arc=90, mode=Mode.SUBTRACT)
    with BuildSketch(Plane(origin=(10.05, 10.05, 0), x_dir=(0, 1, 0), z_dir=(-1, 0, 0))) as fase1_piece_40:
        Polygon((0.1, -FASE1_SIZE), (0.1 + FASE1_SIZE, 0), (0.1, 0), align=None)
    revolve(axis=Axis((10.05, 10.05, 0), (0, 0, -1)), revolution_arc=90, mode=Mode.SUBTRACT)
    with BuildSketch(Plane(origin=(10.05, 10.05, 28), x_dir=(0, 1, 0), z_dir=(-1, 0, 0))) as fase1_piece_41:
        Polygon((0.1 + FASE1_SIZE, 0), (0.1, FASE1_SIZE), (0.1, 0), align=None)
    revolve(axis=Axis((10.05, 10.05, 28), (0, 0, -1)), revolution_arc=90, mode=Mode.SUBTRACT)
    with BuildSketch(Plane(origin=(0, 0, 18), x_dir=(-0.5999999999999953, -0.8000000000000035, 0), z_dir=(0.8000000000000035, -0.5999999999999953, 0))) as fase1_piece_42:
        Polygon((31, -FASE1_SIZE), (31 - FASE1_SIZE, 0), (31, 0), align=None)
    revolve(axis=Axis((0, 0, 18), (0, 0, -1)), revolution_arc=16.260204708, mode=Mode.SUBTRACT)
    with BuildSketch(Plane(origin=(0, 0, 28), x_dir=(-0.5999999999999953, -0.8000000000000035, 0), z_dir=(0.8000000000000035, -0.5999999999999953, 0))) as fase1_piece_43:
        Polygon((31 - FASE1_SIZE, 0), (31, FASE1_SIZE), (31, 0), align=None)
    revolve(axis=Axis((0, 0, 28), (0, 0, -1)), revolution_arc=16.260204708, mode=Mode.SUBTRACT)
    with BuildSketch(Plane(origin=(8.1e-08, -25.3, 18), x_dir=(0, -0.027495876610589005, 0.9996219169112968), z_dir=(-1, 0, 0))) as fase1_piece_44_section:
        Polygon((FASE1_SIZE * 0.999621916911, FASE1_SIZE * 0.0274958766106), (-FASE1_SIZE * 0.0274958766106, FASE1_SIZE * 0.999621916911), (0, 0), align=None)
    fase1_piece_44 = extrude(amount=17.100000081, mode=Mode.PRIVATE)
    fase1_piece_44 = fase1_piece_44 - Plane(origin=(0, 0, 18.17274178), x_dir=(1, 0, 0), z_dir=(0, 0, -1)) * Cylinder(25.3, 37, mode=Mode.PRIVATE)
    add(fase1_piece_44, mode=Mode.SUBTRACT)
    with BuildSketch(Plane(origin=(-17.1, -22.8, 18), x_dir=(0, -1, 0), z_dir=(1, 0, 0))) as fase1_piece_45:
        Polygon((2.5, -FASE1_SIZE), (2.5 - FASE1_SIZE, 0), (2.5, 0), align=None)
    revolve(axis=Axis((-17.1, -22.8, 18), (0, 0, -1)), revolution_arc=36.869897646, mode=Mode.SUBTRACT)


solid = part.part
